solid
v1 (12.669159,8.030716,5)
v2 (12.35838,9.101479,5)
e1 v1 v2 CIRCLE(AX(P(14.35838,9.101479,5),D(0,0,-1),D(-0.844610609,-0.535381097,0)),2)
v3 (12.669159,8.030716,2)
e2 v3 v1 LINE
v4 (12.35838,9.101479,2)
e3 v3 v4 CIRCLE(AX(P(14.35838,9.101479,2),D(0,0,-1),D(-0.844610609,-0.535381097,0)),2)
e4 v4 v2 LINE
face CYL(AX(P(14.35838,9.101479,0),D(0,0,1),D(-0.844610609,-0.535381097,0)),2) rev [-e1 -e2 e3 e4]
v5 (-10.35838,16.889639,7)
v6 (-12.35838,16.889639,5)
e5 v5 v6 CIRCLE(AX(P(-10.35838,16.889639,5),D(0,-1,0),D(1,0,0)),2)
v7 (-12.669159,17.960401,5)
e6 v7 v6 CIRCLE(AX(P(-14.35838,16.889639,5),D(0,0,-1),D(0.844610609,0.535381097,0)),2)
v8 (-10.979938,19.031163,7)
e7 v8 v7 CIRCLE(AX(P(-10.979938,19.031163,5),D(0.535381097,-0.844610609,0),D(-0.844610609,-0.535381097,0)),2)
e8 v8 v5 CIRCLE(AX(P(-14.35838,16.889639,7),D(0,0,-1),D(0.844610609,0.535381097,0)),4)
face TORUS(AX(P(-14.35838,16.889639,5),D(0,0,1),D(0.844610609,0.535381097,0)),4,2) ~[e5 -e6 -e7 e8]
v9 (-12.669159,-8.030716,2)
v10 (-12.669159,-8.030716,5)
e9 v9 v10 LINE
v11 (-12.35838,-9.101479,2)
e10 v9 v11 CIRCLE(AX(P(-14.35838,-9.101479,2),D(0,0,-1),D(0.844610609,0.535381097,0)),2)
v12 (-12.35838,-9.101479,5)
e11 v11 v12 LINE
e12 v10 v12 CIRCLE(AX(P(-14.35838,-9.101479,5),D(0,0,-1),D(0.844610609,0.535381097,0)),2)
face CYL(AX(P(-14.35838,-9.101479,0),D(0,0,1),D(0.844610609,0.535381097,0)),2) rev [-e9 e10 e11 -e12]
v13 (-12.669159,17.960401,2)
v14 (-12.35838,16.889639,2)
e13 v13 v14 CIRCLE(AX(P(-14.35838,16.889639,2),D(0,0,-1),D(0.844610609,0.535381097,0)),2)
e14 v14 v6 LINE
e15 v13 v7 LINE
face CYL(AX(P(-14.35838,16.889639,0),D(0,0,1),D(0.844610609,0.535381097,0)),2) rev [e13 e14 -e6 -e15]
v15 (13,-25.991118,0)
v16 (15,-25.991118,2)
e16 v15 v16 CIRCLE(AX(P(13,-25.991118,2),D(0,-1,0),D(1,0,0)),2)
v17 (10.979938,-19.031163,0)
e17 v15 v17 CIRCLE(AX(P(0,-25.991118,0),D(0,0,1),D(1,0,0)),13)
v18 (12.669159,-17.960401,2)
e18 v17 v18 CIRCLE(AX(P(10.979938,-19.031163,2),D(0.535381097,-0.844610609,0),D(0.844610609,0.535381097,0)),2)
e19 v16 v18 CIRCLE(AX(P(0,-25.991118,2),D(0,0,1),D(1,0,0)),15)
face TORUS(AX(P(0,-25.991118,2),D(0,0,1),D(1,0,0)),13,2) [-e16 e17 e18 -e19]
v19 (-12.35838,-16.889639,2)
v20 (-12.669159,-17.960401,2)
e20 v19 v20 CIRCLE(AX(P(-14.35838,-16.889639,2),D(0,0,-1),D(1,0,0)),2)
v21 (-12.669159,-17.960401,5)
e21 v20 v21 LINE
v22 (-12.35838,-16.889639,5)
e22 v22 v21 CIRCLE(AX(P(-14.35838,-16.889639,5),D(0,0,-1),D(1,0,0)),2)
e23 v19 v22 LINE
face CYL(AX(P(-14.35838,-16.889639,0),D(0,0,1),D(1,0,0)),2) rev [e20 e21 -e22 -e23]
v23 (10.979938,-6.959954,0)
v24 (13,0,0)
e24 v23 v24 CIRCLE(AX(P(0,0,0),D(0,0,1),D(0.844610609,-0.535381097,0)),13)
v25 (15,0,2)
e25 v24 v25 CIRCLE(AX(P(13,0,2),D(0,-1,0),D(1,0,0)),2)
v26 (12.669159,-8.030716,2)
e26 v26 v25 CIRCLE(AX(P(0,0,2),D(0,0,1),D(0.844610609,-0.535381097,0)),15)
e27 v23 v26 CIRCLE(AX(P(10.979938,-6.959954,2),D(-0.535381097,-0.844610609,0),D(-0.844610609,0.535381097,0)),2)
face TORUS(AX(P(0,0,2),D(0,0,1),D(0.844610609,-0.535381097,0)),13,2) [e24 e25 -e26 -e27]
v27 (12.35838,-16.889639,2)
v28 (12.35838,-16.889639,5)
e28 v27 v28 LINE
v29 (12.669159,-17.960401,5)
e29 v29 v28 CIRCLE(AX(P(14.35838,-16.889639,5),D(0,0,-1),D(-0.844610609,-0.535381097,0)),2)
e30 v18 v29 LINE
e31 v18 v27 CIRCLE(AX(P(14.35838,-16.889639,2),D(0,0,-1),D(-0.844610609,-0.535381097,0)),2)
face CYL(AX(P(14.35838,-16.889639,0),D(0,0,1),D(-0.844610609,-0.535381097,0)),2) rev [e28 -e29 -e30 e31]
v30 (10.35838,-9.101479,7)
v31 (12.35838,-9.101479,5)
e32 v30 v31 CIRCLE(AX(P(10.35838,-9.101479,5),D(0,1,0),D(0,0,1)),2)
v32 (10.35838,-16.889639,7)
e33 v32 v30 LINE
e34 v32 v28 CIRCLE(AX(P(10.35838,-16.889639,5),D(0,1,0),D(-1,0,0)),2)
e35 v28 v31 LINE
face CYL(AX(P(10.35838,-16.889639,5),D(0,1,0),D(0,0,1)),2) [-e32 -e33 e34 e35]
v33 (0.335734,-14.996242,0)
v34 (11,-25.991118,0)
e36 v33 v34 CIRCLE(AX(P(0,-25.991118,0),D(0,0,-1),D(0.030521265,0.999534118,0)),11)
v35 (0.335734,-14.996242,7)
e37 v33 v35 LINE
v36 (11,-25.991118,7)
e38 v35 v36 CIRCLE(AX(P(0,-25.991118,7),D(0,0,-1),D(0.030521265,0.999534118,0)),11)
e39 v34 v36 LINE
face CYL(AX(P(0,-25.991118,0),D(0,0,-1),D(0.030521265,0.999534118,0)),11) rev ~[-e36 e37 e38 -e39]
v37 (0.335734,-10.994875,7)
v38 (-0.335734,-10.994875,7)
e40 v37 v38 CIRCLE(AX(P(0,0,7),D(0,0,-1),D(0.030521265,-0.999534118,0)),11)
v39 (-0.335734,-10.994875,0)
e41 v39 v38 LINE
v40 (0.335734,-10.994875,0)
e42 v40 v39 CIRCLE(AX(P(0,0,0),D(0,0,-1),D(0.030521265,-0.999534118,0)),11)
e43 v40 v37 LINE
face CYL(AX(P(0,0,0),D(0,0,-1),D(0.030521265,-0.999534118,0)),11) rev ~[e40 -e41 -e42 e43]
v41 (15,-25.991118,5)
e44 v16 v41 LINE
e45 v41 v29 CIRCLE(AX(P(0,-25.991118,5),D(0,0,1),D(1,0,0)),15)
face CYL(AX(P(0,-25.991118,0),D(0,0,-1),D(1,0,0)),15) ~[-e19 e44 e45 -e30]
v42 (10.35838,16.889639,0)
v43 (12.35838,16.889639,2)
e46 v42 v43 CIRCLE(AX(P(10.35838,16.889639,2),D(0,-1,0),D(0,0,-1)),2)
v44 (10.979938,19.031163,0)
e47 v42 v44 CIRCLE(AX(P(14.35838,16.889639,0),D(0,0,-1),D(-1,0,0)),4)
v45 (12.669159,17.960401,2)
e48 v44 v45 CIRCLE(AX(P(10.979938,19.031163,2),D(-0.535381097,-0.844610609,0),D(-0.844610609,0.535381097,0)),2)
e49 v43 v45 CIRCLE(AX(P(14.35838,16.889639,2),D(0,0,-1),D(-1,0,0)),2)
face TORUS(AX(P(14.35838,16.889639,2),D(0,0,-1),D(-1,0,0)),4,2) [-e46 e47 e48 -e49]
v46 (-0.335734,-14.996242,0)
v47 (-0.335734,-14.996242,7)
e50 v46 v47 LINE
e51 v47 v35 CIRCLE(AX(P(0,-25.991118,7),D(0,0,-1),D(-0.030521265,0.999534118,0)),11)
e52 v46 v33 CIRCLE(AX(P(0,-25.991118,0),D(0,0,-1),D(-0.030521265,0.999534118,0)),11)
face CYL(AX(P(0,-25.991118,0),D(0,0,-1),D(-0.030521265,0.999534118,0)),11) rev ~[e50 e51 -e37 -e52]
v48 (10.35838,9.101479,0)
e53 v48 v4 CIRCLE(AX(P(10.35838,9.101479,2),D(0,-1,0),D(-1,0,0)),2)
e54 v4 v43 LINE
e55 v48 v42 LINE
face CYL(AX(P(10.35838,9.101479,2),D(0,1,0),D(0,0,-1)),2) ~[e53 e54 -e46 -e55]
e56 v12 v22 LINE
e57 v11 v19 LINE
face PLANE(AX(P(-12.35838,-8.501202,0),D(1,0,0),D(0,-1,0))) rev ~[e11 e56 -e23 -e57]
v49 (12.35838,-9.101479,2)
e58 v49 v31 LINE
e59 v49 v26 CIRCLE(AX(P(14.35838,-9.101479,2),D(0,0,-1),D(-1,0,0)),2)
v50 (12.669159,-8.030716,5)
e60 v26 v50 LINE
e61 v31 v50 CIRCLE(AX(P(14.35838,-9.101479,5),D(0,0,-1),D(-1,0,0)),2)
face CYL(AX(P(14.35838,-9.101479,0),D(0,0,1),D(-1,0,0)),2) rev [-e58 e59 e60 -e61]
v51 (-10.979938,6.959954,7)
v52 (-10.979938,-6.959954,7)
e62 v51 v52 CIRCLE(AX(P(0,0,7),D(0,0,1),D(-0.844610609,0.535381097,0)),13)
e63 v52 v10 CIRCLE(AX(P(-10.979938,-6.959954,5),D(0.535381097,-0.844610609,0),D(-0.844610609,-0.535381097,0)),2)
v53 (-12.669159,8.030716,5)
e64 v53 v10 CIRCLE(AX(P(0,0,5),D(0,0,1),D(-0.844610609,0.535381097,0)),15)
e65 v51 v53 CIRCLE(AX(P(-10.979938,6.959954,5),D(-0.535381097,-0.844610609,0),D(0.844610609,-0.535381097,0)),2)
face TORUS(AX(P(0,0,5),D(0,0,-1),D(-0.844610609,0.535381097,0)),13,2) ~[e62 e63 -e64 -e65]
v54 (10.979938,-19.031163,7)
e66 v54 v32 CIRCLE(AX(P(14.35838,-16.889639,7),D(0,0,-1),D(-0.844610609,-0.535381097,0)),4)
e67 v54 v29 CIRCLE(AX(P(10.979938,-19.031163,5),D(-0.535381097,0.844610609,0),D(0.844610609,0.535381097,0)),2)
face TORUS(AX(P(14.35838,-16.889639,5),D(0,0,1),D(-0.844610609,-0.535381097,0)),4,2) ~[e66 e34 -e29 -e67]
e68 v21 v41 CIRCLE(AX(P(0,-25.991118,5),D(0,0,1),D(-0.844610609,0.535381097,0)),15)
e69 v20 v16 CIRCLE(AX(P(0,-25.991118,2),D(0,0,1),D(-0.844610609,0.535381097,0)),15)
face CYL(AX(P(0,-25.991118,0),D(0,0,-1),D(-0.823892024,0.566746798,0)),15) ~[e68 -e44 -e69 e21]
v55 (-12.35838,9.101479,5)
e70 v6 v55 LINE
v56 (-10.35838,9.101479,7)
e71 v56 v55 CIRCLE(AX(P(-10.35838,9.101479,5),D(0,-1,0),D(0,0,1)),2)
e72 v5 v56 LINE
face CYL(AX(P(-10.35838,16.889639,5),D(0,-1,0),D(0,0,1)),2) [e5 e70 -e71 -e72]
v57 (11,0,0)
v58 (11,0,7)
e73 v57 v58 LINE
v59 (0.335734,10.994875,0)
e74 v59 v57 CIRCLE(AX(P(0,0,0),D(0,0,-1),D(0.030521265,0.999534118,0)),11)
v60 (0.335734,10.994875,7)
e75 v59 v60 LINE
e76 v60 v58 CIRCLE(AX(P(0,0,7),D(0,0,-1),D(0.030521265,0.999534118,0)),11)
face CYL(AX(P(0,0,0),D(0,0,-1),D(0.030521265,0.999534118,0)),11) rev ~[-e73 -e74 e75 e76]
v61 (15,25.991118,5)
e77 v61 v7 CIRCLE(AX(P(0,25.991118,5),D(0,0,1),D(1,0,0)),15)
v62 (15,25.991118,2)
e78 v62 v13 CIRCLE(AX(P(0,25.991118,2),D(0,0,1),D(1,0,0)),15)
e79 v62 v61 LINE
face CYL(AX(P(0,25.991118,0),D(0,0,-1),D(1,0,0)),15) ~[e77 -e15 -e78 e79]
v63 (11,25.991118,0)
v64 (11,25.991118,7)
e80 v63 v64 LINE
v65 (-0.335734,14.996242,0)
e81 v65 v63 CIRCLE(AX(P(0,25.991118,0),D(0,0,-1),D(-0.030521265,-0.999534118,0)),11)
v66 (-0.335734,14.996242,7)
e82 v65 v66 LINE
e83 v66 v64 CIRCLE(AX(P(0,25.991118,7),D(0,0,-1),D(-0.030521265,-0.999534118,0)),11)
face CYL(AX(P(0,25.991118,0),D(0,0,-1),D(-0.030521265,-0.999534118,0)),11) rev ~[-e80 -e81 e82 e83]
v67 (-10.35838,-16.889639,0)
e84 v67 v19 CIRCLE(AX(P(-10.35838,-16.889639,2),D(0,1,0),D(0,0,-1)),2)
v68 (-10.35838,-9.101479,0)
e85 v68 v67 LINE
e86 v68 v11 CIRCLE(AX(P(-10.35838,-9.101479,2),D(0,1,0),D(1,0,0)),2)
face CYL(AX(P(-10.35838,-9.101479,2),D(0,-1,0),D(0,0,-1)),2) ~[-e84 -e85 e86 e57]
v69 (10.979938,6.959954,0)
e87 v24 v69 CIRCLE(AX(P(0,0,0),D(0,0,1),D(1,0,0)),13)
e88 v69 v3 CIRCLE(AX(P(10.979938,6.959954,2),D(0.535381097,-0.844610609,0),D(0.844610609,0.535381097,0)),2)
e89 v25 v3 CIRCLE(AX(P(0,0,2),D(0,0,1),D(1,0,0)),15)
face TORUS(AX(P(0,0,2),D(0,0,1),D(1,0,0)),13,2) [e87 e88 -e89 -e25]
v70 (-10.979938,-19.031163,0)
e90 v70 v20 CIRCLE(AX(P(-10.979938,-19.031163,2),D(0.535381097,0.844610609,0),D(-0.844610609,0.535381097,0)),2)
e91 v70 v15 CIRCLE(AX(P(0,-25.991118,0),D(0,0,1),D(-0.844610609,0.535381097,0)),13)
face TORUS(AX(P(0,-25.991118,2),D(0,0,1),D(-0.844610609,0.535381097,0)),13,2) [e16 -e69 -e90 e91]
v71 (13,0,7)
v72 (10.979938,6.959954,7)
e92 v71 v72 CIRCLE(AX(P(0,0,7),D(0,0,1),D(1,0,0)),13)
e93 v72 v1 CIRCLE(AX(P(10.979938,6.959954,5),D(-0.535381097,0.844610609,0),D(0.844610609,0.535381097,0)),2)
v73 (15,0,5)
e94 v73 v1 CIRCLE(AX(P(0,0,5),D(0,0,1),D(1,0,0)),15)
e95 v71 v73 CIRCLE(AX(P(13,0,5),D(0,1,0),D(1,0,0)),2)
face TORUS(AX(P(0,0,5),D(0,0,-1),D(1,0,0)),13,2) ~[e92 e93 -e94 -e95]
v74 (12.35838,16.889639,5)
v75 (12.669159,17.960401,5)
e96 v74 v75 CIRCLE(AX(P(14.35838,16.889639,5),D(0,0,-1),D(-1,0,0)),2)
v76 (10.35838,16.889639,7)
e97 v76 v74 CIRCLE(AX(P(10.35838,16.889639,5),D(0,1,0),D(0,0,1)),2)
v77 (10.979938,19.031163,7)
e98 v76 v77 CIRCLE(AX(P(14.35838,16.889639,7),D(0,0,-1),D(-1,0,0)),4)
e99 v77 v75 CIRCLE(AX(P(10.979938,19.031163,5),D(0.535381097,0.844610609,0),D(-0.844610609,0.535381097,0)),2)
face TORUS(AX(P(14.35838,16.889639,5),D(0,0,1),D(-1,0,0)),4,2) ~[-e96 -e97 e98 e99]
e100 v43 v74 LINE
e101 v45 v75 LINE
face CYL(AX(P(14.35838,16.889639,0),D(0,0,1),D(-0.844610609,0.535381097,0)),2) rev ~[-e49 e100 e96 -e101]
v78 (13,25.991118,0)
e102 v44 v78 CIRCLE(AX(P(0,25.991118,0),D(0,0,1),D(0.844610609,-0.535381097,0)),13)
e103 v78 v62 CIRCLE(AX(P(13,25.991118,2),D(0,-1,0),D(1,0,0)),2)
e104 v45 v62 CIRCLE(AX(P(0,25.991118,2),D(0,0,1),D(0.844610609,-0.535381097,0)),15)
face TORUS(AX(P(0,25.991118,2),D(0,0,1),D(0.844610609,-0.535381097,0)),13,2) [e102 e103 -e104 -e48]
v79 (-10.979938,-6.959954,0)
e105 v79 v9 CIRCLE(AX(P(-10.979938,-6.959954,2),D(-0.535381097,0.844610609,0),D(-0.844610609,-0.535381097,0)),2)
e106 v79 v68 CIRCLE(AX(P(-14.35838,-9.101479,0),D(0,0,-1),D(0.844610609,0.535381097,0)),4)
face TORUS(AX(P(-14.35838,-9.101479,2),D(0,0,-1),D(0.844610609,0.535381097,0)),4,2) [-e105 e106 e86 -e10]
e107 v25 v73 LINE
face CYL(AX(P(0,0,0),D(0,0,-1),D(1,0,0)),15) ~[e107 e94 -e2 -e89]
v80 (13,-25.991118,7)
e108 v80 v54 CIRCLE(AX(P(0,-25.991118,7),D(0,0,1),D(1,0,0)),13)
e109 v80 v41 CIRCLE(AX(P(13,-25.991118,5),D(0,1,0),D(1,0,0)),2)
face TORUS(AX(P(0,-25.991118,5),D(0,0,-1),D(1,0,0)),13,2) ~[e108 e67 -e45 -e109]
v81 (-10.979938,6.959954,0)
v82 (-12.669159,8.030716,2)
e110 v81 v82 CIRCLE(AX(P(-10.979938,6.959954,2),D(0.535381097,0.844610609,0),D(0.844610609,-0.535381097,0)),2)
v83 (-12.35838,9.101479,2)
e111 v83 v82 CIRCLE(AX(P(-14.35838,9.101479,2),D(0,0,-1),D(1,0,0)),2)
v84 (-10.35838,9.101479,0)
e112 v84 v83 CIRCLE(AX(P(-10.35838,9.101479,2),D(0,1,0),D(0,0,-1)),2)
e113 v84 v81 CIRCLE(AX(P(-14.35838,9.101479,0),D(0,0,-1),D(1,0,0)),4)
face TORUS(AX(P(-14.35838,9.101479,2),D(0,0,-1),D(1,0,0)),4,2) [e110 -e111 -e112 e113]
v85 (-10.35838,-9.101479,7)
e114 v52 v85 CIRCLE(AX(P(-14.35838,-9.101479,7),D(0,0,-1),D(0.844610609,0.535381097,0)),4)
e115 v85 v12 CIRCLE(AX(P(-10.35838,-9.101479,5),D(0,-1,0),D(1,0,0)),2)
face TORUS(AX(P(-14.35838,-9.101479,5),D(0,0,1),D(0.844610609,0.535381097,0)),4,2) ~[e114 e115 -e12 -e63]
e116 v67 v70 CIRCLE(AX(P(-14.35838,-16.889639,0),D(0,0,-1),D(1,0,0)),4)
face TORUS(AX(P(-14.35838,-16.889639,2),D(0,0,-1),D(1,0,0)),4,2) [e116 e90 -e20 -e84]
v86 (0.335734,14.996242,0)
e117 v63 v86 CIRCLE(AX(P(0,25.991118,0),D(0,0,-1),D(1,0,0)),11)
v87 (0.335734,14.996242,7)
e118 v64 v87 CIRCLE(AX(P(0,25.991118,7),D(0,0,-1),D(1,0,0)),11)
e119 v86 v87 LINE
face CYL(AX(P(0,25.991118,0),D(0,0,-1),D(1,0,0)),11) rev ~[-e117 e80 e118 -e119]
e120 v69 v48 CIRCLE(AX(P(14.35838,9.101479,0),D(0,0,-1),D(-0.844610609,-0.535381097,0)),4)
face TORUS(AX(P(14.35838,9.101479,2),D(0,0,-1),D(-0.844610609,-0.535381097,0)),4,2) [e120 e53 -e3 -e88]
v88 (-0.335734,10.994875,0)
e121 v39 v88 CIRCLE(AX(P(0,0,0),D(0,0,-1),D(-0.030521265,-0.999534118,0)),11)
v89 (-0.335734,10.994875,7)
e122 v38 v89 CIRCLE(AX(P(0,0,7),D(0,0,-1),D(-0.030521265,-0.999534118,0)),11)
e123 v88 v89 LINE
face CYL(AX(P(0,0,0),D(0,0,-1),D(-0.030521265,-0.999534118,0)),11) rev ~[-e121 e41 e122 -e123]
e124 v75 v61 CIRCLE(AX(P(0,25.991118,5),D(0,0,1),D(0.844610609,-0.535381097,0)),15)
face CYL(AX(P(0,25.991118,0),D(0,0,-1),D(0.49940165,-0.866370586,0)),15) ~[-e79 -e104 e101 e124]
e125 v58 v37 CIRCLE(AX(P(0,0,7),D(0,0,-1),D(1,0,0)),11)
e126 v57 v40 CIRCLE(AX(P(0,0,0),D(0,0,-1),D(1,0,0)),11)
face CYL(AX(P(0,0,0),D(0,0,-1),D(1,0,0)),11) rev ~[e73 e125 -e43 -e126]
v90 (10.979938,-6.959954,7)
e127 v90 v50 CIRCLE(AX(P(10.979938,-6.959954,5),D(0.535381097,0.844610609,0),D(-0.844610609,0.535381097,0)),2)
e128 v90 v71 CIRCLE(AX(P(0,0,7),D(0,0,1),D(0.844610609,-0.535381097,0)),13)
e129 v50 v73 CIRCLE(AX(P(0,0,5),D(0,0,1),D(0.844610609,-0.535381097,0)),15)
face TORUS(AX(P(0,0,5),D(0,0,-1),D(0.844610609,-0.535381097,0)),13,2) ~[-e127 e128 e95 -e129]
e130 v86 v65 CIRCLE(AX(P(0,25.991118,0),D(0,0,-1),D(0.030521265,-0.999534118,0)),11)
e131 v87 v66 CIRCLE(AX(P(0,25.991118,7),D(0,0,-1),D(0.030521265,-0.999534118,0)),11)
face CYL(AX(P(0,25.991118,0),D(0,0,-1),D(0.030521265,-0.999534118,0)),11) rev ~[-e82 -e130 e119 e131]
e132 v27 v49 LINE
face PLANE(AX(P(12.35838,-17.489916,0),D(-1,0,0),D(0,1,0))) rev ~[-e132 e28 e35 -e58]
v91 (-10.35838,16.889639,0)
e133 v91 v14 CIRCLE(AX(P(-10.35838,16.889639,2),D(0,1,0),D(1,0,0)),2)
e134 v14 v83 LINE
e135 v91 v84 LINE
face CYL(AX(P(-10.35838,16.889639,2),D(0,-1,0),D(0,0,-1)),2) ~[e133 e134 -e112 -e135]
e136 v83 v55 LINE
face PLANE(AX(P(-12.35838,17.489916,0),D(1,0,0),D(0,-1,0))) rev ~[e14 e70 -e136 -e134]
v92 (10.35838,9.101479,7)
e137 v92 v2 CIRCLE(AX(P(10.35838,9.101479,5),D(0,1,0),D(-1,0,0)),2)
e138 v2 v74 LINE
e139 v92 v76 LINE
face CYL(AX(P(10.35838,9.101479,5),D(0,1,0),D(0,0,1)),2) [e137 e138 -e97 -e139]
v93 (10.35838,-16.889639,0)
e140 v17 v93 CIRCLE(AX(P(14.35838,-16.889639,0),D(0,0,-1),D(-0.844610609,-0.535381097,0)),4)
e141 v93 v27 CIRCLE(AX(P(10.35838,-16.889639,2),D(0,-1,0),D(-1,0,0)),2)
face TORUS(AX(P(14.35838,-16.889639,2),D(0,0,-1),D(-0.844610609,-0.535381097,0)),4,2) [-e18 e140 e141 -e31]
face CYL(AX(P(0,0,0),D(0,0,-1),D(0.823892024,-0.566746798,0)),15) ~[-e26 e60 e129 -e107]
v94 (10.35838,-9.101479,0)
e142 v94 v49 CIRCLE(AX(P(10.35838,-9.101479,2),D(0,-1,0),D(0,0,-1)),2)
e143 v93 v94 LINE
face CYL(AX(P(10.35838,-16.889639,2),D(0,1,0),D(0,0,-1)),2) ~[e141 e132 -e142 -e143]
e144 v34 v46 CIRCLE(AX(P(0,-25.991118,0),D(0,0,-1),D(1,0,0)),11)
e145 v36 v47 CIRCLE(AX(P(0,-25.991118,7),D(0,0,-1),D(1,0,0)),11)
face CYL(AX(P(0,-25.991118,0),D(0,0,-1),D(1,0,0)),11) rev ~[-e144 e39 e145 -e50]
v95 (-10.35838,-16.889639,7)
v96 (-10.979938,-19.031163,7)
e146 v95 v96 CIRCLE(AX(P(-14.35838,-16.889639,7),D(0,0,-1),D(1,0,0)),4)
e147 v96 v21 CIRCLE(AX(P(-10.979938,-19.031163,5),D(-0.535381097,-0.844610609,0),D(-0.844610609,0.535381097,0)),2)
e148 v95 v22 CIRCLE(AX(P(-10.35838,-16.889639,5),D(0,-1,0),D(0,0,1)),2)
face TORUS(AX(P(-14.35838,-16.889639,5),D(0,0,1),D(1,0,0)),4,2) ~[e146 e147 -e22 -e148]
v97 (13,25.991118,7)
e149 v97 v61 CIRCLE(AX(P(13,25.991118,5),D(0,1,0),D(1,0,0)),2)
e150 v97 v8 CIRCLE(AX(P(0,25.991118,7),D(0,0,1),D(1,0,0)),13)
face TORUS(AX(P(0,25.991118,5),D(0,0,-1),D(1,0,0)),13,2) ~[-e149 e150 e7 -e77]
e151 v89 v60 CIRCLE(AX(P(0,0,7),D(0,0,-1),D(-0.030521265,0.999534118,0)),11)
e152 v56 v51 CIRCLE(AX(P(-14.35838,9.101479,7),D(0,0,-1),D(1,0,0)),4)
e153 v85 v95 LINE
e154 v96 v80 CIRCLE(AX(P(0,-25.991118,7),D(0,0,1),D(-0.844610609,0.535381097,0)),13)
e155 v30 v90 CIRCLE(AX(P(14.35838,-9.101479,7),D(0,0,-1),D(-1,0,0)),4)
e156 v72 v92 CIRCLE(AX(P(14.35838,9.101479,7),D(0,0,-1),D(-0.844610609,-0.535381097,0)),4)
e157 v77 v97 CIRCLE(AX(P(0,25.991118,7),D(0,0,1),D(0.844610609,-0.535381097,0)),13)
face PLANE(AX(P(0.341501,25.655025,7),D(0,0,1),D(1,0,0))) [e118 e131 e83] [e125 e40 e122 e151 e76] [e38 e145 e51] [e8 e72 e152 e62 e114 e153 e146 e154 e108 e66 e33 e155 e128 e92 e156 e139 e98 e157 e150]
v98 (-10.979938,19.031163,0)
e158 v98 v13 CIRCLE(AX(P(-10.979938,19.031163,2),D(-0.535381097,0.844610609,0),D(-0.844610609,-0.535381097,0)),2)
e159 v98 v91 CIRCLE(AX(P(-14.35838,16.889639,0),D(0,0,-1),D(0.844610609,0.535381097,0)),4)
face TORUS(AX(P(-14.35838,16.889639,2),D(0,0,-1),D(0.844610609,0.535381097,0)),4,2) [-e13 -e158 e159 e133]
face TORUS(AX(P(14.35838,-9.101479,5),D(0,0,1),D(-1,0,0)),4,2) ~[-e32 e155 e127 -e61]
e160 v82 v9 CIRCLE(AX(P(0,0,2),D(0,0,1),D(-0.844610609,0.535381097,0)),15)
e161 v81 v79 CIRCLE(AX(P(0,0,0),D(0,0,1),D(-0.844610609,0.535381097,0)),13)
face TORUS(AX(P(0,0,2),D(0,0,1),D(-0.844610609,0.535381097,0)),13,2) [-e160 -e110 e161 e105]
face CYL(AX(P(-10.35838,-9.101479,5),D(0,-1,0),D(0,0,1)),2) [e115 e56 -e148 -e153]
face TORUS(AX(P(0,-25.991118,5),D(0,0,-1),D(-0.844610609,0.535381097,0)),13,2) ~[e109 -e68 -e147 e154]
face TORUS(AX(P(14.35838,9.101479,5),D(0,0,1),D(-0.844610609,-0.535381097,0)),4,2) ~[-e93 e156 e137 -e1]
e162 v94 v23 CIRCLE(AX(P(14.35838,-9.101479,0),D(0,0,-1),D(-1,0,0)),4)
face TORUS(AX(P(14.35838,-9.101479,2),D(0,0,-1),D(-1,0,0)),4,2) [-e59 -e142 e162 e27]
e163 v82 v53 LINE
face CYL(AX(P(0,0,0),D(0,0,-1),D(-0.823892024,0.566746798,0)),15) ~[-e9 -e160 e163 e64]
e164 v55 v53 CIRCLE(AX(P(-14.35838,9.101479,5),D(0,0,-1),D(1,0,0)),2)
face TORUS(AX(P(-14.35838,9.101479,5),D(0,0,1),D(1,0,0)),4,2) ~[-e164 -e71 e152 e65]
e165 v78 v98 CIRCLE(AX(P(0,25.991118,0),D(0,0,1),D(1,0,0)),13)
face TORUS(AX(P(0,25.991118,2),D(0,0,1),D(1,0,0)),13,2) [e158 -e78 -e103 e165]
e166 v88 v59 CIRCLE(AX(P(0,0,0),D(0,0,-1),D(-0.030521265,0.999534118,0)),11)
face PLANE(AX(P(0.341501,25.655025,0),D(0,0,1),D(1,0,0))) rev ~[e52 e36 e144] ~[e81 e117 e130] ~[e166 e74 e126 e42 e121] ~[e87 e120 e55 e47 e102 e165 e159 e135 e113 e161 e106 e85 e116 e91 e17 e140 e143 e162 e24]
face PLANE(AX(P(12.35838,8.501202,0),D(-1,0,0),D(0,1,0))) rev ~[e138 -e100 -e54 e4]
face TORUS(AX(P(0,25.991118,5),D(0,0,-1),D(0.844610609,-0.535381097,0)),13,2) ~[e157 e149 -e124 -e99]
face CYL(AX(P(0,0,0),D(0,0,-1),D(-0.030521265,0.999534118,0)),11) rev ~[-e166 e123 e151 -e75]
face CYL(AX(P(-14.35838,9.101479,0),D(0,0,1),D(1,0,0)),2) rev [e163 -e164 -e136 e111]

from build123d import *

# Parameters (mm, degrees)
F1_DEPTH = 7
F2_F1_R  = 2
F2_F2_R  = 2


with BuildPart() as f1:
    # F0 (on Top) → F1 (new body)
    with BuildSketch(Plane.XY):
        with BuildLine():
            ThreePointArc((0.3357339129, 14.9962422873), (4.0392104898, 14.4459260215), (7.4910247439, 12.9955587909))
            ThreePointArc((7.4910247439, 12.9955587909), (10.1759290258, 14.9706607644), (12.3583803583, 17.4899156126))
            ThreePointArc((12.3583803583, 17.4899156126), (14.3243796615, 21.540033746), (15, 25.9911175817))
            ThreePointArc((15, 25.9911175817), (-4.4510838357, 40.3154972432), (-12.3583803583, 17.4899156126))
            ThreePointArc((-12.3583803583, 17.4899156126), (-10.1759290258, 14.9706607644), (-7.4910247439, 12.9955587909))
            ThreePointArc((-7.4910247439, 12.9955587909), (-4.0392104898, 14.4459260215), (-0.3357339129, 14.9962422873))
            ThreePointArc((-0.3357339129, 14.9962422873), (-7.6585549211, 33.8870998842), (11, 25.9911175817))
            ThreePointArc((11, 25.9911175817), (7.8959823025, 18.3325626607), (0.3357339129, 14.9962422873))
        make_face()
        with BuildLine():
            ThreePointArc((-0.3357339129, 10.9948752944), (0, 11), (0.3357339129, 10.9948752944))
            ThreePointArc((0.3357339129, 10.9948752944), (4.0392104898, 11.5451915602), (7.4910247439, 12.9955587909))
            ThreePointArc((7.4910247439, 12.9955587909), (4.0392104898, 14.4459260215), (0.3357339129, 14.9962422873))
            ThreePointArc((0.3357339129, 14.9962422873), (0, 14.9911175817), (-0.3357339129, 14.9962422873))
            ThreePointArc((-0.3357339129, 14.9962422873), (-4.0392104898, 14.4459260215), (-7.4910247439, 12.9955587909))
            ThreePointArc((-7.4910247439, 12.9955587909), (-4.0392104898, 11.5451915602), (-0.3357339129, 10.9948752944))
        make_face()
        with BuildLine():
            ThreePointArc((12.3583803583, 17.4899156126), (10.1759290258, 14.9706607644), (7.4910247439, 12.9955587909))
            ThreePointArc((7.4910247439, 12.9955587909), (10.1759290258, 11.0204568173), (12.3583803583, 8.5012019691))
            Line((12.3583803583, 8.5012019691), (12.3583803583, 17.4899156126))
        make_face()
        with BuildLine():
            ThreePointArc((-12.3583803583, 8.5012019691), (-10.1759290258, 11.0204568173), (-7.4910247439, 12.9955587909))
            ThreePointArc((-7.4910247439, 12.9955587909), (-10.1759290258, 14.9706607644), (-12.3583803583, 17.4899156126))
            Line((-12.3583803583, 17.4899156126), (-12.3583803583, 8.5012019691))
        make_face()
        with BuildLine():
            ThreePointArc((-0.3357339129, -10.9948752944), (-11, 0), (-0.3357339129, 10.9948752944))
            ThreePointArc((-0.3357339129, 10.9948752944), (-4.0392104898, 11.5451915602), (-7.4910247439, 12.9955587909))
            ThreePointArc((-7.4910247439, 12.9955587909), (-10.1759290258, 11.0204568173), (-12.3583803583, 8.5012019691))
            ThreePointArc((-12.3583803583, 8.5012019691), (-15, 0), (-12.3583803583, -8.5012019691))
            ThreePointArc((-12.3583803583, -8.5012019691), (-10.1759290258, -11.0204568173), (-7.4910247439, -12.9955587909))
            ThreePointArc((-7.4910247439, -12.9955587909), (-4.0392104898, -11.5451915602), (-0.3357339129, -10.9948752944))
        make_face()
        with BuildLine():
            ThreePointArc((12.3583803583, -8.5012019691), (10.1759290258, -11.0204568173), (7.4910247439, -12.9955587909))
            ThreePointArc((7.4910247439, -12.9955587909), (10.1759290258, -14.9706607644), (12.3583803583, -17.4899156126))
            Line((12.3583803583, -17.4899156126), (12.3583803583, -8.5012019691))
        make_face()
        with BuildLine():
            ThreePointArc((-12.3583803583, -17.4899156126), (-10.1759290258, -14.9706607644), (-7.4910247439, -12.9955587909))
            ThreePointArc((-7.4910247439, -12.9955587909), (-10.1759290258, -11.0204568173), (-12.3583803583, -8.5012019691))
            Line((-12.3583803583, -8.5012019691), (-12.3583803583, -17.4899156126))
        make_face()
        with BuildLine():
            ThreePointArc((7.4910247439, -12.9955587909), (4.0392104898, -11.5451915602), (0.3357339129, -10.9948752944))
            ThreePointArc((0.3357339129, -10.9948752944), (0, -11), (-0.3357339129, -10.9948752944))
            ThreePointArc((-0.3357339129, -10.9948752944), (-4.0392104898, -11.5451915602), (-7.4910247439, -12.9955587909))
            ThreePointArc((-7.4910247439, -12.9955587909), (-4.0392104898, -14.4459260215), (-0.3357339129, -14.9962422873))
            ThreePointArc((-0.3357339129, -14.9962422873), (0, -14.9911175817), (0.3357339129, -14.9962422873))
            ThreePointArc((0.3357339129, -14.9962422873), (4.0392104898, -14.4459260215), (7.4910247439, -12.9955587909))
        make_face()
        with BuildLine():
            ThreePointArc((12.3583803583, -17.4899156126), (10.1759290258, -14.9706607644), (7.4910247439, -12.9955587909))
            ThreePointArc((7.4910247439, -12.9955587909), (4.0392104898, -14.4459260215), (0.3357339129, -14.9962422873))
            ThreePointArc((0.3357339129, -14.9962422873), (7.8959823025, -18.3325626607), (11, -25.9911175817))
            ThreePointArc((11, -25.9911175817), (-7.6585549211, -33.8870998842), (-0.3357339129, -14.9962422873))
            ThreePointArc((-0.3357339129, -14.9962422873), (-4.0392104898, -14.4459260215), (-7.4910247439, -12.9955587909))
            ThreePointArc((-7.4910247439, -12.9955587909), (-10.1759290258, -14.9706607644), (-12.3583803583, -17.4899156126))
            ThreePointArc((-12.3583803583, -17.4899156126), (-4.4510838357, -40.3154972432), (15, -25.9911175817))
            ThreePointArc((15, -25.9911175817), (14.3243796615, -21.540033746), (12.3583803583, -17.4899156126))
        make_face()
        with BuildLine():
            ThreePointArc((0.3357339129, 10.9948752944), (7.8959823025, 7.6585549211), (11, 0))
            ThreePointArc((11, 0), (7.8959823025, -7.6585549211), (0.3357339129, -10.9948752944))
            ThreePointArc((0.3357339129, -10.9948752944), (4.0392104898, -11.5451915602), (7.4910247439, -12.9955587909))
            ThreePointArc((7.4910247439, -12.9955587909), (10.1759290258, -11.0204568173), (12.3583803583, -8.5012019691))
            ThreePointArc((12.3583803583, -8.5012019691), (14.3243796615, -4.4510838357), (15, 0))
            ThreePointArc((15, 0), (14.3243796615, 4.4510838357), (12.3583803583, 8.5012019691))
            ThreePointArc((12.3583803583, 8.5012019691), (10.1759290258, 11.0204568173), (7.4910247439, 12.9955587909))
            ThreePointArc((7.4910247439, 12.9955587909), (4.0392104898, 11.5451915602), (0.3357339129, 10.9948752944))
        make_face()
    extrude(amount=F1_DEPTH)

    # F2: fillet of radius 2 on 16 edges, made by hand

    # F2_f1
    f2_f1_edges = [f1.edges().sort_by_distance(p)[0] for p in [
        (-12.3583803583, -17.4899156126, 3.5),
        (12.3583803583, -17.4899156126, 3.5),
        (12.3583803583, -8.5012019691, 3.5),
        (12.3583803583, 8.5012019691, 3.5),
        (12.3583803583, 17.4899156126, 3.5),
        (-12.3583803583, 17.4899156126, 3.5),
        (-12.3583803583, 8.5012019691, 3.5),
        (-12.3583803583, -8.5012019691, 3.5),
    ]]
    fillet(f2_f1_edges, radius=F2_F1_R)

    # F2_f2
    f2_f2_edges = [f1.edges().sort_by_distance(p)[0] for p in [
        (0, -40.9911175817, 0),
        (0, -40.9911175817, 7),
        (15, 0, 0),
        (15, 0, 7),
        (0, 40.9911175817, 0),
        (0, 40.9911175817, 7),
        (-15, 0, 0),
        (-15, 0, 7),
        (-12.4376458065, 8.5440032789, 7),
        (-12.4376458065, -8.5440032789, 7),
        (-12.4376458065, 8.5440032789, 0),
        (-12.4376458065, -8.5440032789, 0),
        (12.4376458065, 17.4471143028, 7),
        (-12.4376458065, 17.4471143028, 7),
        (12.4376458065, 17.4471143028, 0),
        (-12.4376458065, 17.4471143028, 0),
        (12.4376458065, -8.5440032789, 7),
        (12.4376458065, 8.5440032789, 7),
        (12.4376458065, -8.5440032789, 0),
        (12.4376458065, 8.5440032789, 0),
        (-12.4376458065, -17.4471143028, 7),
        (12.4376458065, -17.4471143028, 7),
        (-12.4376458065, -17.4471143028, 0),
        (12.4376458065, -17.4471143028, 0),
    ]]
    fillet(f2_f2_edges, radius=F2_F2_R)


solid = f1.part
